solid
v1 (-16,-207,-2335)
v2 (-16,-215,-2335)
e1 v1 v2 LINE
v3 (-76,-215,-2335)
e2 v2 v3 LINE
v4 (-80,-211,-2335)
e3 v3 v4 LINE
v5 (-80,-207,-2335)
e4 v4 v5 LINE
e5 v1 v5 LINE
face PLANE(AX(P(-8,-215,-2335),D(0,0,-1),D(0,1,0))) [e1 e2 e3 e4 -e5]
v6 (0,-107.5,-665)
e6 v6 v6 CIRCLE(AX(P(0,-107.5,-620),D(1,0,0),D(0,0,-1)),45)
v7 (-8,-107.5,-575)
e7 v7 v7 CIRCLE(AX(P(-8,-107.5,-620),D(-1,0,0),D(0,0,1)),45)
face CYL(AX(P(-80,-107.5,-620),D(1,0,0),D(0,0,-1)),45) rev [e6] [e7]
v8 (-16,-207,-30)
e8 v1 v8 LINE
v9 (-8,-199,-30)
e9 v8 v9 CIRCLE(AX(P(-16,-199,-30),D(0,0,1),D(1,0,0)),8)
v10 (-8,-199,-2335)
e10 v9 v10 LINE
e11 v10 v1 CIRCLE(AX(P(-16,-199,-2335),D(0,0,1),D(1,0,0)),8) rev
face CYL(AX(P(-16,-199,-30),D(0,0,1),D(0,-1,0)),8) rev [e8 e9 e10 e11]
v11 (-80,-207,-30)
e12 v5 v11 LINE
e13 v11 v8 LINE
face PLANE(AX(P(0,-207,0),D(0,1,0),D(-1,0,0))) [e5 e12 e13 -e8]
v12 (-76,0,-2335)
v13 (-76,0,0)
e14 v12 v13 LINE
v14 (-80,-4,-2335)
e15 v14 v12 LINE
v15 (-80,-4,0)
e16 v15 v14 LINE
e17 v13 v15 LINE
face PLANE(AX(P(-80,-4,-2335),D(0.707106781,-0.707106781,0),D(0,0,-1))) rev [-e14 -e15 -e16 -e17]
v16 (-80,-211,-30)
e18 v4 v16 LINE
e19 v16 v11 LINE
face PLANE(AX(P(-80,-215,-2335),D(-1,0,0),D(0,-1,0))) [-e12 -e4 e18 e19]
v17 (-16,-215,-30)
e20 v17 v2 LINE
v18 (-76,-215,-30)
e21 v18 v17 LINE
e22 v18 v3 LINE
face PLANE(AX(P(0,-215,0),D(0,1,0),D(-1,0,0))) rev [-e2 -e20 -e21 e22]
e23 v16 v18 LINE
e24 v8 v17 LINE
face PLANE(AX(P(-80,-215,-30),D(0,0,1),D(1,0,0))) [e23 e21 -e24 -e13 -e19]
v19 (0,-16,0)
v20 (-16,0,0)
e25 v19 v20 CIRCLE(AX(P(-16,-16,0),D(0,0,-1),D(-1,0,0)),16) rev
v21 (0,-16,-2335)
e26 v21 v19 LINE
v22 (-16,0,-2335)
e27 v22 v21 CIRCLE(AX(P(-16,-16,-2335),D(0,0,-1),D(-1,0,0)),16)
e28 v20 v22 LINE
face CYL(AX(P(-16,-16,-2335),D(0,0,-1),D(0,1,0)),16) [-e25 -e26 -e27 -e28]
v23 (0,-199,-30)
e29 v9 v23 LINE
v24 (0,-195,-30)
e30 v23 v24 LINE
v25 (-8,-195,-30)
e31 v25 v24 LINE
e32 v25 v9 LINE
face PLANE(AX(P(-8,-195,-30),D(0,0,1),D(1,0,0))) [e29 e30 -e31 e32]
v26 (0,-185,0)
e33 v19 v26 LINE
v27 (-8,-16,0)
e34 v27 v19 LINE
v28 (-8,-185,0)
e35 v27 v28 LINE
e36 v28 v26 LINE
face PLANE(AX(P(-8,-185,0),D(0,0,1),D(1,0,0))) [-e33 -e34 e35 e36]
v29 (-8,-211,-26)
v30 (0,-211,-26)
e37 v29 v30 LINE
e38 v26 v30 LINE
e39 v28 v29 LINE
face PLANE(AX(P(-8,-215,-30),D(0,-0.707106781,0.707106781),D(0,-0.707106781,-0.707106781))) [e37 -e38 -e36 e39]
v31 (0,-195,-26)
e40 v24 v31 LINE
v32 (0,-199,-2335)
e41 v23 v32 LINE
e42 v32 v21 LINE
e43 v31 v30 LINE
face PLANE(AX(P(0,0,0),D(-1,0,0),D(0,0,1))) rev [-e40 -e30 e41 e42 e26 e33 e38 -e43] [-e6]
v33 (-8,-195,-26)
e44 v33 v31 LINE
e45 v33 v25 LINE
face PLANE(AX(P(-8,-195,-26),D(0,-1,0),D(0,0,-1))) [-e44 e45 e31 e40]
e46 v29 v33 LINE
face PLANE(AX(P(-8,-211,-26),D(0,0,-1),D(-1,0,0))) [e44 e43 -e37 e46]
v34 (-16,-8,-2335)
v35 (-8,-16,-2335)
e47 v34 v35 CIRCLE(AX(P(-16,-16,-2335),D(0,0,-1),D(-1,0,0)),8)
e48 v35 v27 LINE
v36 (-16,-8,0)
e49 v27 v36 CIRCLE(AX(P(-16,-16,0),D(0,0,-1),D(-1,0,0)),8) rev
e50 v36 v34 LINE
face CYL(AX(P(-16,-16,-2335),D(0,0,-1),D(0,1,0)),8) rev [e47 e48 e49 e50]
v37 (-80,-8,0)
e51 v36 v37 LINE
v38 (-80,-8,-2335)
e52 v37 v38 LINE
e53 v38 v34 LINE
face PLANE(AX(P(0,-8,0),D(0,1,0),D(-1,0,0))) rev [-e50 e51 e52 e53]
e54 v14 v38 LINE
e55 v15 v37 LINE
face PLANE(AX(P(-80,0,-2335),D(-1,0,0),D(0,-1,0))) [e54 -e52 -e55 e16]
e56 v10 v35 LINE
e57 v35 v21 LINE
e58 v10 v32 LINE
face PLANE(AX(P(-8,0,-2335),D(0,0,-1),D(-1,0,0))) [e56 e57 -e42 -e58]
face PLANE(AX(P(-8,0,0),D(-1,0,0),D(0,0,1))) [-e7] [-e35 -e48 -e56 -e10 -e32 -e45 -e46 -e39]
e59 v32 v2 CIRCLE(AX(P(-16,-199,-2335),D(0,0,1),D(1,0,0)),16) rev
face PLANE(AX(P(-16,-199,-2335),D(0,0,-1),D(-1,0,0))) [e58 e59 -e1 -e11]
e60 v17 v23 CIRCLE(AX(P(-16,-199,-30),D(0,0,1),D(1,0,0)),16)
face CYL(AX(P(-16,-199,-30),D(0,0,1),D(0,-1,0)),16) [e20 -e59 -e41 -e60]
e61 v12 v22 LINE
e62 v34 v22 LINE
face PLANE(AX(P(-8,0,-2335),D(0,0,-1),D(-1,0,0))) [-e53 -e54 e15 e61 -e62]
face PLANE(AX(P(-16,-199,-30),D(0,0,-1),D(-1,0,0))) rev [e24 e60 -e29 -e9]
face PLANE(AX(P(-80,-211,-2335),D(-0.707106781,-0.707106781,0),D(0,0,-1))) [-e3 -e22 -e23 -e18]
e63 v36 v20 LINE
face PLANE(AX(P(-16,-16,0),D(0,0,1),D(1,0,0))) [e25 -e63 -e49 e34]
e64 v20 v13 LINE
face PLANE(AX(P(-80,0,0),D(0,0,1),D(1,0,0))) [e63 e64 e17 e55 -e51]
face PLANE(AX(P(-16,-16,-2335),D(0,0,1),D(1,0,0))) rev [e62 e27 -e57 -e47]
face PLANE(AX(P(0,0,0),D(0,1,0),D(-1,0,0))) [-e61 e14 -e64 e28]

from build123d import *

# Parameters (mm, degrees)
SM_BASE_FLANGE_1_DEPTH             = 8
SM_EDGE_FLANGE_1_STRIP_W           = 48
SM_EDGE_FLANGE_1_STRIP_H           = 8
SM_EDGE_FLANGE_1_STRIP_CUT_DEPTH   = 2335
SM_EDGE_FLANGE_1_STRIP_2_W         = 48
SM_EDGE_FLANGE_1_STRIP_2_H         = 8
SM_EDGE_FLANGE_1_STRIP_CUT_2_DEPTH = 2305
SM_EDGE_FLANGE_1_RELIEF_W          = 52
SM_EDGE_FLANGE_1_RELIEF_H          = 4
SM_EDGE_FLANGE_1_RELIEF_CUT_DEPTH  = 8
SM_EDGE_FLANGE_1_DEPTH             = 2335
SM_EDGE_FLANGE_1_BEND_DEPTH        = 2305
CHAMFER_1_SIZE                     = 4
SKETCH_12_R                        = 45
CUT_EXTRUDE_1_DEPTH                = 2347.241675531


# Sheet-metal steps are written as plain solids
with BuildPart() as part:
    # Sketch 1 → 基体-法兰1 (new body)
    with BuildSketch(Plane(origin=(0, 0, 0), x_dir=(0, 0, -1), z_dir=(1, 0, 0))):
        Polygon((0, 0), (2335, 0), (2335, -215), (30, -215), (0, -185), align=None)
    extrude(amount=-SM_BASE_FLANGE_1_DEPTH)

    # 边线-法兰1 strip (across the edge) → 边线-法兰1 strip cut (cut)
    with BuildSketch(Plane(origin=(-8, 0, 0), x_dir=(0, -1, 0), z_dir=(0, 0, -1))):
        with Locations((-8, -4)):
            Rectangle(SM_EDGE_FLANGE_1_STRIP_W, SM_EDGE_FLANGE_1_STRIP_H)
    extrude(amount=SM_EDGE_FLANGE_1_STRIP_CUT_DEPTH, mode=Mode.SUBTRACT)

    # 边线-法兰1 strip 2 (across the edge) → 边线-法兰1 strip cut 2 (cut)
    with BuildSketch(Plane(origin=(-8, -215, -2335), x_dir=(0, 1, 0), z_dir=(0, 0, 1))):
        with Locations((-8, -4)):
            Rectangle(SM_EDGE_FLANGE_1_STRIP_2_W, SM_EDGE_FLANGE_1_STRIP_2_H)
    extrude(amount=SM_EDGE_FLANGE_1_STRIP_CUT_2_DEPTH, mode=Mode.SUBTRACT)

    # 边线-法兰1 relief (on the sheet) → 边线-法兰1 relief cut (cut)
    with BuildSketch(Plane(origin=(-8, -199, -2335), x_dir=(0, 1, 0), z_dir=(-1, 0, 0))):
        with Locations((-22, -2307)):
            Rectangle(SM_EDGE_FLANGE_1_RELIEF_W, SM_EDGE_FLANGE_1_RELIEF_H)
    extrude(amount=-SM_EDGE_FLANGE_1_RELIEF_CUT_DEPTH, mode=Mode.SUBTRACT)

    # 边线-法兰1 section (across the edge) → 边线-法兰1 (add)
    with BuildSketch(Plane(origin=(-8, 0, 0), x_dir=(0, -1, 0), z_dir=(0, 0, -1))):
        with BuildLine():
            Line((0, 8), (0, 72))
            Line((0, 72), (8, 72))
            Line((8, 72), (8, 8))
            ThreePointArc((8, 8), (10.343145751, 2.343145751), (16, 0))
            Line((16, 0), (16, -8))
            ThreePointArc((16, -8), (4.686291501, -3.313708499), (0, 8))
        make_face()
    extrude(amount=SM_EDGE_FLANGE_1_DEPTH)

    # 边线-法兰1 section 2 (across the edge) → 边线-法兰1 bend (add)
    with BuildSketch(Plane(origin=(-8, -215, -2335), x_dir=(0, 1, 0), z_dir=(0, 0, 1))):
        with BuildLine():
            Line((0, 8), (0, 72))
            Line((0, 72), (8, 72))
            Line((8, 72), (8, 8))
            ThreePointArc((8, 8), (10.343145751, 2.343145751), (16, 0))
            Line((16, 0), (16, -8))
            ThreePointArc((16, -8), (4.686291501, -3.313708499), (0, 8))
        make_face()
    extrude(amount=SM_EDGE_FLANGE_1_BEND_DEPTH)

    # 倒角1
    chamfer_1_edges = [part.edges().sort_by_distance(p)[0] for p in [
        (-80, 0, -1167.5),
        (-80, -215, -1182.5),
    ]]
    chamfer(chamfer_1_edges, length=CHAMFER_1_SIZE)

    # 草图12 → 切除-拉伸1 (cut, through all)
    with BuildSketch(Plane(origin=(0, 0, 0), x_dir=(0, 0, -1), z_dir=(1, 0, 0))):
        with Locations((620, -107.5)):
            Circle(SKETCH_12_R)
    extrude(amount=-CUT_EXTRUDE_1_DEPTH, mode=Mode.SUBTRACT)


solid = part.part
